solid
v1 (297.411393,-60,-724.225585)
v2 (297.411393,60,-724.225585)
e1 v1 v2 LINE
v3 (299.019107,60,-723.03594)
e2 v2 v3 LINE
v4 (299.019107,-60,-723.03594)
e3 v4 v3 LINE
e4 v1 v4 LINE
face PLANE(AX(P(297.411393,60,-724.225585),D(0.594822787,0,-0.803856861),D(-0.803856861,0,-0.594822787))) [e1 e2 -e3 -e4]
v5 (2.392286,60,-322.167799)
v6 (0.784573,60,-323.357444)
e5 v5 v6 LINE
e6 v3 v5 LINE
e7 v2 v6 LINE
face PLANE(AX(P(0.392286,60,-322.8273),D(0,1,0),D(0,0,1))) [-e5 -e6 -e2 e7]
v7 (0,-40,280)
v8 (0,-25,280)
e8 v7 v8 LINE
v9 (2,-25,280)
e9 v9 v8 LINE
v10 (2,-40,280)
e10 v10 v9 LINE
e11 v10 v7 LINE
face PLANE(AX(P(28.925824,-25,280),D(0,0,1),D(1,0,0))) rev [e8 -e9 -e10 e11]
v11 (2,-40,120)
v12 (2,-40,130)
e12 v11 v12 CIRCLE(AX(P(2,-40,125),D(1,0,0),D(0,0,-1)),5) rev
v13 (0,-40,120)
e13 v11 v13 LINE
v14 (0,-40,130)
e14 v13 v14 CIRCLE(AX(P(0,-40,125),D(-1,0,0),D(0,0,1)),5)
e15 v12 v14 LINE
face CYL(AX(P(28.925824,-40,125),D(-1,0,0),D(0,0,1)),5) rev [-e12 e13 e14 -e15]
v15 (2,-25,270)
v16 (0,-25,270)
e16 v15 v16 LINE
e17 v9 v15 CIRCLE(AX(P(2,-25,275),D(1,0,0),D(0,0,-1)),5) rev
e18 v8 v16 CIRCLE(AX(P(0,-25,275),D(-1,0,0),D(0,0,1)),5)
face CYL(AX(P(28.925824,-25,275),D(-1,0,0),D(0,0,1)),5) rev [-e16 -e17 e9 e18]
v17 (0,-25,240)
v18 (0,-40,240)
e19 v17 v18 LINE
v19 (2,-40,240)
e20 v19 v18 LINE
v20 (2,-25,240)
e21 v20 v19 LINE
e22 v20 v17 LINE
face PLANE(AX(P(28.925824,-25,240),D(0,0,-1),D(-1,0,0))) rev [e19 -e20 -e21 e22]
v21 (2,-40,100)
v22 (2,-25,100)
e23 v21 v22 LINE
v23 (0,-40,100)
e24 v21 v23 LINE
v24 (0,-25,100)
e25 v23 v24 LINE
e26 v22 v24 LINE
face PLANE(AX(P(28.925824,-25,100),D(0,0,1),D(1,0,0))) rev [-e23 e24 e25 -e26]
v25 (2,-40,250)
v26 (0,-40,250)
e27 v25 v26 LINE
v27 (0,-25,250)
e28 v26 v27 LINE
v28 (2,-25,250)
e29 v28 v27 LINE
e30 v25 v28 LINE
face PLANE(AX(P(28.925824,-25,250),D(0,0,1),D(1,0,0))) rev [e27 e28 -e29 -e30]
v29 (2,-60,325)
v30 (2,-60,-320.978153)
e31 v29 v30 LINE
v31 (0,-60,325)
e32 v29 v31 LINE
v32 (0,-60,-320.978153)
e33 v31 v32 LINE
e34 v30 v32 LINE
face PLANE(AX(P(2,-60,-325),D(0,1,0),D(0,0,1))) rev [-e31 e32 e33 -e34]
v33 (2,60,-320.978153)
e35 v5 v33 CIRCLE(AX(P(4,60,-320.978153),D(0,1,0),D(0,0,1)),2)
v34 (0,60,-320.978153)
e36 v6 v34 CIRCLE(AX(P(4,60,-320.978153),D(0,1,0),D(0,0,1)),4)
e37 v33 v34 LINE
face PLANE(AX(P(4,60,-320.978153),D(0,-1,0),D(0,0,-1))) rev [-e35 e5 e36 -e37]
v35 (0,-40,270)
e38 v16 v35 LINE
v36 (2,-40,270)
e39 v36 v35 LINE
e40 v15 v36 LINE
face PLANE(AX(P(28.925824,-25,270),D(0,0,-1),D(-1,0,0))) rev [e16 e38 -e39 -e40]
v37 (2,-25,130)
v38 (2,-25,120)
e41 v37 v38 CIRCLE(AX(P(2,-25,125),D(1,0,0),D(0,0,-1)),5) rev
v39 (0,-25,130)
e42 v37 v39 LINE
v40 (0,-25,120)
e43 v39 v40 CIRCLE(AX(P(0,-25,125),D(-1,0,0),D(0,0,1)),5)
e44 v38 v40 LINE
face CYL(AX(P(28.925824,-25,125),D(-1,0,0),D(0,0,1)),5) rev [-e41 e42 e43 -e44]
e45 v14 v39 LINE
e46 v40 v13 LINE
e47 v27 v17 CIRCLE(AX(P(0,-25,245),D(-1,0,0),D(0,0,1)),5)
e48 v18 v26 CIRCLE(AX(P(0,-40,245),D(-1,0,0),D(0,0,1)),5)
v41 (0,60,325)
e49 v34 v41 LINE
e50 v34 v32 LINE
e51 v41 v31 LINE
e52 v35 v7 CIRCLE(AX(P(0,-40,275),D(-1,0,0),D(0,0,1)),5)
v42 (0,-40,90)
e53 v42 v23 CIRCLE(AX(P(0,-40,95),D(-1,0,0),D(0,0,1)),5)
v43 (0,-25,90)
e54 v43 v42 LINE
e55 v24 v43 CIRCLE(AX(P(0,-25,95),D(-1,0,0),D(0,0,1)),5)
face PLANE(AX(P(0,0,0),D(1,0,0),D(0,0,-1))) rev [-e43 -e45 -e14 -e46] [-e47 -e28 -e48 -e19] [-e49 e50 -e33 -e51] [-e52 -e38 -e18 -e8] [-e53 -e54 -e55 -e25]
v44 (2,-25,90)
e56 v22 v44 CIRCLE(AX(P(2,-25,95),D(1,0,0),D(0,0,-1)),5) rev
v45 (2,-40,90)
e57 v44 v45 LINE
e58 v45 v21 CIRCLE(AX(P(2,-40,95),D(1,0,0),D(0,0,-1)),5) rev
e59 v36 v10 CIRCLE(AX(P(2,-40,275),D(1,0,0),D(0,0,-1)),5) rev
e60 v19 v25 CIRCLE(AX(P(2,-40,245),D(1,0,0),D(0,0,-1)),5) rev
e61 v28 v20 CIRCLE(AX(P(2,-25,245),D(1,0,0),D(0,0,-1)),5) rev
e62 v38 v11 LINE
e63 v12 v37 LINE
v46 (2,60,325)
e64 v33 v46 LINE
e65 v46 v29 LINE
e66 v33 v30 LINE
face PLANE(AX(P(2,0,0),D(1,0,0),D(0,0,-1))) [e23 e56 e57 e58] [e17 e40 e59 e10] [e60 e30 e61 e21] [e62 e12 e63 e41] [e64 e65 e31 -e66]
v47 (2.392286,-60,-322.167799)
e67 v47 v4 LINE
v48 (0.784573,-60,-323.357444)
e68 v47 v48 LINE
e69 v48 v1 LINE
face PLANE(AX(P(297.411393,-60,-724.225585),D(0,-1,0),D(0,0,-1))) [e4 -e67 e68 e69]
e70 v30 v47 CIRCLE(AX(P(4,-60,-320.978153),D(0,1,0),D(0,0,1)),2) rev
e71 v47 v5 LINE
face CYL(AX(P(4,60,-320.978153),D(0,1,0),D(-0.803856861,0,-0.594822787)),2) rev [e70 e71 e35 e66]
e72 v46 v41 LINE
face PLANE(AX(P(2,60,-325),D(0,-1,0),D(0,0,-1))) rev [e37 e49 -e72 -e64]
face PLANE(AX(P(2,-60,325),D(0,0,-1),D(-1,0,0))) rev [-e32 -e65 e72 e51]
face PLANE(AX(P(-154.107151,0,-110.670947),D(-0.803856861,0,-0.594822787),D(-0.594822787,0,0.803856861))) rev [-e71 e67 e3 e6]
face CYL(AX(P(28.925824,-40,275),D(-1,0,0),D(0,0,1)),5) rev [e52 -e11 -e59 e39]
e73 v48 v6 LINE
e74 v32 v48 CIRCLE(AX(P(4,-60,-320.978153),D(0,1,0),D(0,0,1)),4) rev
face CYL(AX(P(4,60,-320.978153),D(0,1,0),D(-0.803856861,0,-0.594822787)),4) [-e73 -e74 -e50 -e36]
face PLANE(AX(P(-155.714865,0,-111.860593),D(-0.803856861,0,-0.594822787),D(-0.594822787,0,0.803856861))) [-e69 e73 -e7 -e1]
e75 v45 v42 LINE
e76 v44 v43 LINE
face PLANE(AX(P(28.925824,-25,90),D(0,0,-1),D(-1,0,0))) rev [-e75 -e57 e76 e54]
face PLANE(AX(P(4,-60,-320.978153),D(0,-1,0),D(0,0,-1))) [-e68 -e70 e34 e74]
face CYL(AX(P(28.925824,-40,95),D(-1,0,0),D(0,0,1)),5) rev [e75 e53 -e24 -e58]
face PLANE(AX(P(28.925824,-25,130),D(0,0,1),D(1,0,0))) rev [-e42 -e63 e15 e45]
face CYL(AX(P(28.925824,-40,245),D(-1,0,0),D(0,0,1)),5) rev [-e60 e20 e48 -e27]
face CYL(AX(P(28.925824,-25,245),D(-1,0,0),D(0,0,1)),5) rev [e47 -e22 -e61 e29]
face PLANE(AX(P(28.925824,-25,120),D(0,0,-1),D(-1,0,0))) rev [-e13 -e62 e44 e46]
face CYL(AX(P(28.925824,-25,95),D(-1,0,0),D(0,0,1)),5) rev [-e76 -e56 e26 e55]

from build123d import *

# Parameters (mm, degrees)
SKETCH2_W            = 650
SKETCH2_H            = 120
BASE_FLANGE1_DEPTH   = 2
EDGE_FLANGE1_START   = -60
EDGE_FLANGE1_DEPTH   = 120
EDGE_FLANGE1_2_DEPTH = 120
CUT_EXTRUDE1_DEPTH   = 2


# Read off the part's stored shape, not the designer's step: Edge-Flange1
# Sheet-metal steps are written as plain solids
with BuildPart() as part:
    # Sketch2 → Base-Flange1 (new body)
    with BuildSketch(Plane(origin=(0, 0, 0), x_dir=(0, 0, -1), z_dir=(1, 0, 0))):
        Rectangle(SKETCH2_W, SKETCH2_H)
    extrude(amount=BASE_FLANGE1_DEPTH)

    # Edge-Flange1 outline → Edge-Flange1 (cut)
    with BuildSketch(Plane(origin=(0, 0, 0), x_dir=(1, 0, 0), z_dir=(0, 1, 0)).offset(EDGE_FLANGE1_START)):
        with BuildLine():
            ThreePointArc((0, 320.978152936), (0.201203495, 322.230808162), (0.784572558, 323.357444083))
            Line((0.784572558, 323.357444083), (2, 325))
            Line((2, 325), (0, 325))
            Line((0, 325), (0, 320.978152936))
        make_face()
    extrude(amount=EDGE_FLANGE1_DEPTH, mode=Mode.SUBTRACT)

    # Edge-Flange1 2 outline → Edge-Flange1 2 (add)
    with BuildSketch(Plane(origin=(0, 0, 0), x_dir=(1, 0, 0), z_dir=(0, 1, 0)).offset(EDGE_FLANGE1_START)):
        with BuildLine():
            Line((297.411393376, 724.225585433), (2, 325))
            Line((2, 325), (2, 320.978152936))
            ThreePointArc((2, 320.978152936), (2.100601748, 321.604480549), (2.392286279, 322.167798509))
            Line((2.392286279, 322.167798509), (299.019107097, 723.035939859))
            Line((299.019107097, 723.035939859), (297.411393376, 724.225585433))
        make_face()
    extrude(amount=EDGE_FLANGE1_2_DEPTH)

    # Sketch10 → Cut-Extrude1 (cut)
    with BuildSketch(Plane.ZY):
        with BuildLine():
            Line((280, -25), (280, -40))
            ThreePointArc((280, -40), (275, -45), (270, -40))
            Line((270, -40), (270, -25))
            ThreePointArc((270, -25), (275, -20), (280, -25))
        make_face()
        with BuildLine():
            Line((250, -25), (250, -40))
            ThreePointArc((250, -40), (245, -45), (240, -40))
            Line((240, -40), (240, -25))
            ThreePointArc((240, -25), (245, -20), (250, -25))
        make_face()
        with BuildLine():
            Line((130, -25), (130, -40))
            ThreePointArc((130, -40), (125, -45), (120, -40))
            Line((120, -40), (120, -25))
            ThreePointArc((120, -25), (125, -20), (130, -25))
        make_face()
        with BuildLine():
            Line((100, -25), (100, -40))
            ThreePointArc((100, -40), (95, -45), (90, -40))
            Line((90, -40), (90, -25))
            ThreePointArc((90, -25), (95, -20), (100, -25))
        make_face()
    extrude(amount=-CUT_EXTRUDE1_DEPTH, mode=Mode.SUBTRACT)


solid = part.part
